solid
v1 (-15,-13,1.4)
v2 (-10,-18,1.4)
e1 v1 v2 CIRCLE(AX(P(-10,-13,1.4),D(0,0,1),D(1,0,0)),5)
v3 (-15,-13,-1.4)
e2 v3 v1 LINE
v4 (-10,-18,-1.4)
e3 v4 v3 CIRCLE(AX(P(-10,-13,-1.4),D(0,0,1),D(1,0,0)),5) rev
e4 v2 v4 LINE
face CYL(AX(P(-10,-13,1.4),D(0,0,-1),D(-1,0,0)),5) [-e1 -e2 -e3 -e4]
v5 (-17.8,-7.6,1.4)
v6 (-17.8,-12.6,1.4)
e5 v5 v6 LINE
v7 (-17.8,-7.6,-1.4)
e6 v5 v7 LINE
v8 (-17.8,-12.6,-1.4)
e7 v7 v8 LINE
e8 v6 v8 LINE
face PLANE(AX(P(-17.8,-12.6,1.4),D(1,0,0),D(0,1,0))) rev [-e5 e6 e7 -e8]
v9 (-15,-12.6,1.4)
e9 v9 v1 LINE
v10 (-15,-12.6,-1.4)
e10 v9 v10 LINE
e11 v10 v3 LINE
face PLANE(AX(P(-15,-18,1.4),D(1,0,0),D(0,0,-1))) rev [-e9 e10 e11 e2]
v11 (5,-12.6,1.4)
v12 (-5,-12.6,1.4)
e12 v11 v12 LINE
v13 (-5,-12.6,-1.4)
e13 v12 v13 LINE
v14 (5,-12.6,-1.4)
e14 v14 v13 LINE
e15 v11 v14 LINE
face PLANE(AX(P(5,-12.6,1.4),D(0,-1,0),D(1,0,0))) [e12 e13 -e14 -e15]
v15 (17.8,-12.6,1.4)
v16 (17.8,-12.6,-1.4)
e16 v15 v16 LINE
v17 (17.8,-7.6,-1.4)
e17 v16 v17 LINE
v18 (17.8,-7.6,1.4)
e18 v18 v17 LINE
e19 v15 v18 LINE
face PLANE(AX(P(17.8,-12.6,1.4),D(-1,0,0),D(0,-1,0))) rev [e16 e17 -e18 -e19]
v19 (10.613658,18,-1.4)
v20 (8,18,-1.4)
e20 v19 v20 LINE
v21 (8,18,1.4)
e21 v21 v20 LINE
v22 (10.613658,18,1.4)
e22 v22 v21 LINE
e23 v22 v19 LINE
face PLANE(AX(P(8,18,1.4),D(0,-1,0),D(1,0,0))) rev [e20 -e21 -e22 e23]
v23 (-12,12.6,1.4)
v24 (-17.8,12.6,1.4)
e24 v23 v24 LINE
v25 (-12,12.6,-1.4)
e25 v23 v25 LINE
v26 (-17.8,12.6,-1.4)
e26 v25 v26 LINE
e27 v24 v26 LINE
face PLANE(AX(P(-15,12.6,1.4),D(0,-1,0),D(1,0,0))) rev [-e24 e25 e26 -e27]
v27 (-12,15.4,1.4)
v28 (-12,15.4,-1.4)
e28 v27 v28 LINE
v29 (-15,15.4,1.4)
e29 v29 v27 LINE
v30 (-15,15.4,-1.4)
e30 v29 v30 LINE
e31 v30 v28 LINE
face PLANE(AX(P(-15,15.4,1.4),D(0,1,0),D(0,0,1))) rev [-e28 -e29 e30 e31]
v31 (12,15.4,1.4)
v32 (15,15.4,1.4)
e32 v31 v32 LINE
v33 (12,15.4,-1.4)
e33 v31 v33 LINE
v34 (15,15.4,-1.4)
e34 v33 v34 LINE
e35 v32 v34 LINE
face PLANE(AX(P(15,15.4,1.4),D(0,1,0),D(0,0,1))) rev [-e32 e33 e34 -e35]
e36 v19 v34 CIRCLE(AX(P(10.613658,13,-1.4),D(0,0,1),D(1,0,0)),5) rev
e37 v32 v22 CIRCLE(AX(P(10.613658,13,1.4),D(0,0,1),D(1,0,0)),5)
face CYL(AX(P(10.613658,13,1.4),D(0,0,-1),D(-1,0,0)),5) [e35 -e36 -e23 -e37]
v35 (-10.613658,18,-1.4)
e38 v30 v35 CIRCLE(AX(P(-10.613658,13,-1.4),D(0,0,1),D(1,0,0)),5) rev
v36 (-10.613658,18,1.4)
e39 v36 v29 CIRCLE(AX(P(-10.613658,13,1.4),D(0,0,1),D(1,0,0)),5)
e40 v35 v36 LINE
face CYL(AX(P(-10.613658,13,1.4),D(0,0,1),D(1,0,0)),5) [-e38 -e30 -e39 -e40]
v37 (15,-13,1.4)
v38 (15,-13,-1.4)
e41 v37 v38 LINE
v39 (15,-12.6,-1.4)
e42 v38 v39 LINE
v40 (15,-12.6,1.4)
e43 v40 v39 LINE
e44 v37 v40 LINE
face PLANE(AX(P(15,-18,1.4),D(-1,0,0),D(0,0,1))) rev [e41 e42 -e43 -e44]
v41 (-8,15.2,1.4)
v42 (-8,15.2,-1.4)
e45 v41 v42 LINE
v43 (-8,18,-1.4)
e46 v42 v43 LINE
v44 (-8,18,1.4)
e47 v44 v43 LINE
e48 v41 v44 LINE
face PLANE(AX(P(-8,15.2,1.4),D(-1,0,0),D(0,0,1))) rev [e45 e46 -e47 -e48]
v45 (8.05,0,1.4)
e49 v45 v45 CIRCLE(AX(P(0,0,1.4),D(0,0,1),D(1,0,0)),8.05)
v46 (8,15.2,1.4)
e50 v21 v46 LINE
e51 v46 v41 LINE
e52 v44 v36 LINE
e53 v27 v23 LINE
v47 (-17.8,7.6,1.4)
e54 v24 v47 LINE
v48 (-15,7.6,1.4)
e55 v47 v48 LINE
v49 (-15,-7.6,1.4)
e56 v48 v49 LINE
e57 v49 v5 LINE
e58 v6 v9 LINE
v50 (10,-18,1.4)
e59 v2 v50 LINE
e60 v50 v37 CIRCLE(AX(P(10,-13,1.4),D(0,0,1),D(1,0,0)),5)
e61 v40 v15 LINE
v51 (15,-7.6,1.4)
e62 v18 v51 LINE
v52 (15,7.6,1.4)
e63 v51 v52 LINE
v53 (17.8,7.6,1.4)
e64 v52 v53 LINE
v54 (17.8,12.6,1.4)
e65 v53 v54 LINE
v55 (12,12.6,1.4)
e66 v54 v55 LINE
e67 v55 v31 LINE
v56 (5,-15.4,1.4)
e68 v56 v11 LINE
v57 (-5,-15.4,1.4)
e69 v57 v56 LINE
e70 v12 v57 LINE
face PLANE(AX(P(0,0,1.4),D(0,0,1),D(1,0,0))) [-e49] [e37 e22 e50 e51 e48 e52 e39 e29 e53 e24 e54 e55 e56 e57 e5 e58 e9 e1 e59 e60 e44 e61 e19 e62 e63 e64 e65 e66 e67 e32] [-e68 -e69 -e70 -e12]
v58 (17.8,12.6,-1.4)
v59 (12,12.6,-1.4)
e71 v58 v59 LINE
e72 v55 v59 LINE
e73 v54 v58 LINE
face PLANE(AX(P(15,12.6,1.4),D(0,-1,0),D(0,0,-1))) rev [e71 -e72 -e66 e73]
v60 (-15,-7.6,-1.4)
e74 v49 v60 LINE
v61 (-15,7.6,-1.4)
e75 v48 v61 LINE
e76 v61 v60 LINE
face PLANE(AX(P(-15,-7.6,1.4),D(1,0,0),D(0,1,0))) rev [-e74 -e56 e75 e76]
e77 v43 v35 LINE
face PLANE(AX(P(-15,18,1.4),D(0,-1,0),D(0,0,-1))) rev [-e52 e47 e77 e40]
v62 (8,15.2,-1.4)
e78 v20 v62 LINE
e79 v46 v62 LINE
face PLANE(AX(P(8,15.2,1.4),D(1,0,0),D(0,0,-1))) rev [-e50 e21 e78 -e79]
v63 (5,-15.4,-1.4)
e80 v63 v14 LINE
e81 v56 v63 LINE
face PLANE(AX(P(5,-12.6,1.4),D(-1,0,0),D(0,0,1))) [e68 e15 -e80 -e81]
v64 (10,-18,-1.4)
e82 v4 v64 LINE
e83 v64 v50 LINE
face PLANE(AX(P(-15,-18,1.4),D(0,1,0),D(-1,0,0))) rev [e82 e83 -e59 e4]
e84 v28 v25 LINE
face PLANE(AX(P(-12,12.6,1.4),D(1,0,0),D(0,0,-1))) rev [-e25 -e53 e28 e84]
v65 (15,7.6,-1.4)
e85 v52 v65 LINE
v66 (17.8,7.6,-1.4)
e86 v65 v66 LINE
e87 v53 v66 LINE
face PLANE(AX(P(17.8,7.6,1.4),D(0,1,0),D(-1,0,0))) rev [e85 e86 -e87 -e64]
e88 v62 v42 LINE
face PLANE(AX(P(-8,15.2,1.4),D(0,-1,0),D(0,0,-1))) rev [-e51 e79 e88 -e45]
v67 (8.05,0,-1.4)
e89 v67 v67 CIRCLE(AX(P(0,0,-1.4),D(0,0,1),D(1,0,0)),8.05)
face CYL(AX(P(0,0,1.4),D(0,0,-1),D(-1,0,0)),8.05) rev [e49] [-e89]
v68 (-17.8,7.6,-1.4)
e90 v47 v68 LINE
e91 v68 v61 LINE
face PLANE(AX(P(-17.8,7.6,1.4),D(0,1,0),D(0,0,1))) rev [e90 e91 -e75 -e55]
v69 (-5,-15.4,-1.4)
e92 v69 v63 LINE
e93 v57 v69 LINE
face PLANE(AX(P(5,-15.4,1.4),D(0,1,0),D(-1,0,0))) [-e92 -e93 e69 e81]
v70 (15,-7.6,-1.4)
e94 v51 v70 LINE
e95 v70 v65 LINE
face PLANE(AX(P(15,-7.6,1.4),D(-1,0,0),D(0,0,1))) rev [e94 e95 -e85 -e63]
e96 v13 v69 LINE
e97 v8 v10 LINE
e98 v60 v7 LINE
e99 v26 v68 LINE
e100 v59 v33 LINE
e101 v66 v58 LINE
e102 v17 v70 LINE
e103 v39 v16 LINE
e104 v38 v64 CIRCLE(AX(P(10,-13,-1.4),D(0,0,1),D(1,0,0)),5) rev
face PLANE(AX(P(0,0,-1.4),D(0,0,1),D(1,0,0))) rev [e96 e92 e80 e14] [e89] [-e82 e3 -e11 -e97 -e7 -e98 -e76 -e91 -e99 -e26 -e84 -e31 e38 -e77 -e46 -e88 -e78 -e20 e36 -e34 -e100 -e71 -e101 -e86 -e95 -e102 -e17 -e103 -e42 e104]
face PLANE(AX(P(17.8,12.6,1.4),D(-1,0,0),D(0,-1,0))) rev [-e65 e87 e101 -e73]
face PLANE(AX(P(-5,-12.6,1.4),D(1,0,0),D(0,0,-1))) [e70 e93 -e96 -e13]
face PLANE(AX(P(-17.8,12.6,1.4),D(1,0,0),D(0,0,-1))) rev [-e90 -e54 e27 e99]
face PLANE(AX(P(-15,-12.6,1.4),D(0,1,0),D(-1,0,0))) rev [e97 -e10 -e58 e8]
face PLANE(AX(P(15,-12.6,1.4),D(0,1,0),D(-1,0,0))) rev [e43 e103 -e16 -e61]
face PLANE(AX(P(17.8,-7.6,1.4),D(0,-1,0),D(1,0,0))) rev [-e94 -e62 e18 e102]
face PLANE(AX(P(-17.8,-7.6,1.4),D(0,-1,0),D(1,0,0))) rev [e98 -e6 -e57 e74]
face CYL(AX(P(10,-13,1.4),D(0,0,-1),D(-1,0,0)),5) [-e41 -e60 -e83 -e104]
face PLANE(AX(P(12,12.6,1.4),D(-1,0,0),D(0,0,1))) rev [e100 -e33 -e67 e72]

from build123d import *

# Parameters (mm, degrees)
SKETCH_1_R      = 8.05
SKETCH_1_W      = 10
SKETCH_1_H      = 2.8
EXTRUDE_1_DEPTH = 1.4
FILLET_1_R      = 5


with BuildPart() as part:
    # Эскиз1 → Бобышка-Вытянуть1 (new, symmetric)
    with BuildSketch(Plane.XY):
        Polygon((-15, 12.6), (-17.8, 12.6), (-17.8, 7.6), (-15, 7.6), (-15, -7.6), (-17.8, -7.6), (-17.8, -12.6), (-15, -12.6), (-15, -18), (15, -18), (15, -12.6), (17.8, -12.6), (17.8, -7.6), (15, -7.6), (15, 7.6), (17.8, 7.6), (17.8, 12.6), (15, 12.6), (12, 12.6), (12, 15.4), (15, 15.4), (15, 18), (8, 18), (8, 15.2), (-8, 15.2), (-8, 18), (-15, 18), (-15, 15.4), (-12, 15.4), (-12, 12.6), align=None)
        Circle(SKETCH_1_R, mode=Mode.SUBTRACT)
        with Locations((0, -14)):
            Rectangle(SKETCH_1_W, SKETCH_1_H, mode=Mode.SUBTRACT)
    extrude(amount=EXTRUDE_1_DEPTH, both=True)

    # Скругление1
    # the kernel refuses this fillet: 5 mm, written as the material it takes off along each edge
    with BuildSketch(Plane(origin=(15, 18, -12.3658561), x_dir=(-1, 0, 0), z_dir=(0, 0, 1))) as fillet_1_piece_1:
        with BuildLine():
            CenterArc((4.38634244, 5), FILLET_1_R, 208.685402014, 61.314597986)
            Line((0, 2.6), (-0.087726849, 2.552))
            ThreePointArc((-0.087726849, 2.552), (-0.1, 1.3), (-0.1, 0))
            Line((-0.1, 0), (0, -0.1))
            Line((0, -0.1), (4.38634244, -0.1))
            Line((4.38634244, -0.1), (4.38634244, 0))
        make_face()
    extrude(amount=24.731712199, mode=Mode.SUBTRACT)
    with BuildSketch(Plane(origin=(15, -18, -13.9), x_dir=(0, 1, 0), z_dir=(0, 0, 1)), Plane(origin=(-15, -18, -13.9), x_dir=(1, 0, 0), z_dir=(0, 0, 1))) as fillet_1_piece_2:
        with BuildLine():
            CenterArc((FILLET_1_R, FILLET_1_R), FILLET_1_R, 180, 90)
            Line((0, FILLET_1_R), (-FILLET_1_R * 0.02, FILLET_1_R))
            Line((-FILLET_1_R * 0.02, FILLET_1_R), (-FILLET_1_R * 0.02, -FILLET_1_R * 0.02))
            Line((-FILLET_1_R * 0.02, -FILLET_1_R * 0.02), (FILLET_1_R, -FILLET_1_R * 0.02))
            Line((FILLET_1_R, -FILLET_1_R * 0.02), (FILLET_1_R, 0))
        make_face()
    extrude(amount=27.8, mode=Mode.SUBTRACT)
    with BuildSketch(Plane(origin=(-15, 18, -12.3658561), x_dir=(0, -1, 0), z_dir=(0, 0, 1))) as fillet_1_piece_3:
        with BuildLine():
            CenterArc((5, 4.38634244), FILLET_1_R, 180, 61.314597986)
            Line((0, 4.38634244), (-0.1, 4.38634244))
            Line((-0.1, 4.38634244), (-0.1, 0))
            Line((-0.1, 0), (0, -0.1))
            ThreePointArc((0, -0.1), (1.3, -0.1), (2.552, -0.087726849))
            Line((2.552, -0.087726849), (2.6, 0))
        make_face()
    extrude(amount=24.731712199, mode=Mode.SUBTRACT)


solid = part.part
